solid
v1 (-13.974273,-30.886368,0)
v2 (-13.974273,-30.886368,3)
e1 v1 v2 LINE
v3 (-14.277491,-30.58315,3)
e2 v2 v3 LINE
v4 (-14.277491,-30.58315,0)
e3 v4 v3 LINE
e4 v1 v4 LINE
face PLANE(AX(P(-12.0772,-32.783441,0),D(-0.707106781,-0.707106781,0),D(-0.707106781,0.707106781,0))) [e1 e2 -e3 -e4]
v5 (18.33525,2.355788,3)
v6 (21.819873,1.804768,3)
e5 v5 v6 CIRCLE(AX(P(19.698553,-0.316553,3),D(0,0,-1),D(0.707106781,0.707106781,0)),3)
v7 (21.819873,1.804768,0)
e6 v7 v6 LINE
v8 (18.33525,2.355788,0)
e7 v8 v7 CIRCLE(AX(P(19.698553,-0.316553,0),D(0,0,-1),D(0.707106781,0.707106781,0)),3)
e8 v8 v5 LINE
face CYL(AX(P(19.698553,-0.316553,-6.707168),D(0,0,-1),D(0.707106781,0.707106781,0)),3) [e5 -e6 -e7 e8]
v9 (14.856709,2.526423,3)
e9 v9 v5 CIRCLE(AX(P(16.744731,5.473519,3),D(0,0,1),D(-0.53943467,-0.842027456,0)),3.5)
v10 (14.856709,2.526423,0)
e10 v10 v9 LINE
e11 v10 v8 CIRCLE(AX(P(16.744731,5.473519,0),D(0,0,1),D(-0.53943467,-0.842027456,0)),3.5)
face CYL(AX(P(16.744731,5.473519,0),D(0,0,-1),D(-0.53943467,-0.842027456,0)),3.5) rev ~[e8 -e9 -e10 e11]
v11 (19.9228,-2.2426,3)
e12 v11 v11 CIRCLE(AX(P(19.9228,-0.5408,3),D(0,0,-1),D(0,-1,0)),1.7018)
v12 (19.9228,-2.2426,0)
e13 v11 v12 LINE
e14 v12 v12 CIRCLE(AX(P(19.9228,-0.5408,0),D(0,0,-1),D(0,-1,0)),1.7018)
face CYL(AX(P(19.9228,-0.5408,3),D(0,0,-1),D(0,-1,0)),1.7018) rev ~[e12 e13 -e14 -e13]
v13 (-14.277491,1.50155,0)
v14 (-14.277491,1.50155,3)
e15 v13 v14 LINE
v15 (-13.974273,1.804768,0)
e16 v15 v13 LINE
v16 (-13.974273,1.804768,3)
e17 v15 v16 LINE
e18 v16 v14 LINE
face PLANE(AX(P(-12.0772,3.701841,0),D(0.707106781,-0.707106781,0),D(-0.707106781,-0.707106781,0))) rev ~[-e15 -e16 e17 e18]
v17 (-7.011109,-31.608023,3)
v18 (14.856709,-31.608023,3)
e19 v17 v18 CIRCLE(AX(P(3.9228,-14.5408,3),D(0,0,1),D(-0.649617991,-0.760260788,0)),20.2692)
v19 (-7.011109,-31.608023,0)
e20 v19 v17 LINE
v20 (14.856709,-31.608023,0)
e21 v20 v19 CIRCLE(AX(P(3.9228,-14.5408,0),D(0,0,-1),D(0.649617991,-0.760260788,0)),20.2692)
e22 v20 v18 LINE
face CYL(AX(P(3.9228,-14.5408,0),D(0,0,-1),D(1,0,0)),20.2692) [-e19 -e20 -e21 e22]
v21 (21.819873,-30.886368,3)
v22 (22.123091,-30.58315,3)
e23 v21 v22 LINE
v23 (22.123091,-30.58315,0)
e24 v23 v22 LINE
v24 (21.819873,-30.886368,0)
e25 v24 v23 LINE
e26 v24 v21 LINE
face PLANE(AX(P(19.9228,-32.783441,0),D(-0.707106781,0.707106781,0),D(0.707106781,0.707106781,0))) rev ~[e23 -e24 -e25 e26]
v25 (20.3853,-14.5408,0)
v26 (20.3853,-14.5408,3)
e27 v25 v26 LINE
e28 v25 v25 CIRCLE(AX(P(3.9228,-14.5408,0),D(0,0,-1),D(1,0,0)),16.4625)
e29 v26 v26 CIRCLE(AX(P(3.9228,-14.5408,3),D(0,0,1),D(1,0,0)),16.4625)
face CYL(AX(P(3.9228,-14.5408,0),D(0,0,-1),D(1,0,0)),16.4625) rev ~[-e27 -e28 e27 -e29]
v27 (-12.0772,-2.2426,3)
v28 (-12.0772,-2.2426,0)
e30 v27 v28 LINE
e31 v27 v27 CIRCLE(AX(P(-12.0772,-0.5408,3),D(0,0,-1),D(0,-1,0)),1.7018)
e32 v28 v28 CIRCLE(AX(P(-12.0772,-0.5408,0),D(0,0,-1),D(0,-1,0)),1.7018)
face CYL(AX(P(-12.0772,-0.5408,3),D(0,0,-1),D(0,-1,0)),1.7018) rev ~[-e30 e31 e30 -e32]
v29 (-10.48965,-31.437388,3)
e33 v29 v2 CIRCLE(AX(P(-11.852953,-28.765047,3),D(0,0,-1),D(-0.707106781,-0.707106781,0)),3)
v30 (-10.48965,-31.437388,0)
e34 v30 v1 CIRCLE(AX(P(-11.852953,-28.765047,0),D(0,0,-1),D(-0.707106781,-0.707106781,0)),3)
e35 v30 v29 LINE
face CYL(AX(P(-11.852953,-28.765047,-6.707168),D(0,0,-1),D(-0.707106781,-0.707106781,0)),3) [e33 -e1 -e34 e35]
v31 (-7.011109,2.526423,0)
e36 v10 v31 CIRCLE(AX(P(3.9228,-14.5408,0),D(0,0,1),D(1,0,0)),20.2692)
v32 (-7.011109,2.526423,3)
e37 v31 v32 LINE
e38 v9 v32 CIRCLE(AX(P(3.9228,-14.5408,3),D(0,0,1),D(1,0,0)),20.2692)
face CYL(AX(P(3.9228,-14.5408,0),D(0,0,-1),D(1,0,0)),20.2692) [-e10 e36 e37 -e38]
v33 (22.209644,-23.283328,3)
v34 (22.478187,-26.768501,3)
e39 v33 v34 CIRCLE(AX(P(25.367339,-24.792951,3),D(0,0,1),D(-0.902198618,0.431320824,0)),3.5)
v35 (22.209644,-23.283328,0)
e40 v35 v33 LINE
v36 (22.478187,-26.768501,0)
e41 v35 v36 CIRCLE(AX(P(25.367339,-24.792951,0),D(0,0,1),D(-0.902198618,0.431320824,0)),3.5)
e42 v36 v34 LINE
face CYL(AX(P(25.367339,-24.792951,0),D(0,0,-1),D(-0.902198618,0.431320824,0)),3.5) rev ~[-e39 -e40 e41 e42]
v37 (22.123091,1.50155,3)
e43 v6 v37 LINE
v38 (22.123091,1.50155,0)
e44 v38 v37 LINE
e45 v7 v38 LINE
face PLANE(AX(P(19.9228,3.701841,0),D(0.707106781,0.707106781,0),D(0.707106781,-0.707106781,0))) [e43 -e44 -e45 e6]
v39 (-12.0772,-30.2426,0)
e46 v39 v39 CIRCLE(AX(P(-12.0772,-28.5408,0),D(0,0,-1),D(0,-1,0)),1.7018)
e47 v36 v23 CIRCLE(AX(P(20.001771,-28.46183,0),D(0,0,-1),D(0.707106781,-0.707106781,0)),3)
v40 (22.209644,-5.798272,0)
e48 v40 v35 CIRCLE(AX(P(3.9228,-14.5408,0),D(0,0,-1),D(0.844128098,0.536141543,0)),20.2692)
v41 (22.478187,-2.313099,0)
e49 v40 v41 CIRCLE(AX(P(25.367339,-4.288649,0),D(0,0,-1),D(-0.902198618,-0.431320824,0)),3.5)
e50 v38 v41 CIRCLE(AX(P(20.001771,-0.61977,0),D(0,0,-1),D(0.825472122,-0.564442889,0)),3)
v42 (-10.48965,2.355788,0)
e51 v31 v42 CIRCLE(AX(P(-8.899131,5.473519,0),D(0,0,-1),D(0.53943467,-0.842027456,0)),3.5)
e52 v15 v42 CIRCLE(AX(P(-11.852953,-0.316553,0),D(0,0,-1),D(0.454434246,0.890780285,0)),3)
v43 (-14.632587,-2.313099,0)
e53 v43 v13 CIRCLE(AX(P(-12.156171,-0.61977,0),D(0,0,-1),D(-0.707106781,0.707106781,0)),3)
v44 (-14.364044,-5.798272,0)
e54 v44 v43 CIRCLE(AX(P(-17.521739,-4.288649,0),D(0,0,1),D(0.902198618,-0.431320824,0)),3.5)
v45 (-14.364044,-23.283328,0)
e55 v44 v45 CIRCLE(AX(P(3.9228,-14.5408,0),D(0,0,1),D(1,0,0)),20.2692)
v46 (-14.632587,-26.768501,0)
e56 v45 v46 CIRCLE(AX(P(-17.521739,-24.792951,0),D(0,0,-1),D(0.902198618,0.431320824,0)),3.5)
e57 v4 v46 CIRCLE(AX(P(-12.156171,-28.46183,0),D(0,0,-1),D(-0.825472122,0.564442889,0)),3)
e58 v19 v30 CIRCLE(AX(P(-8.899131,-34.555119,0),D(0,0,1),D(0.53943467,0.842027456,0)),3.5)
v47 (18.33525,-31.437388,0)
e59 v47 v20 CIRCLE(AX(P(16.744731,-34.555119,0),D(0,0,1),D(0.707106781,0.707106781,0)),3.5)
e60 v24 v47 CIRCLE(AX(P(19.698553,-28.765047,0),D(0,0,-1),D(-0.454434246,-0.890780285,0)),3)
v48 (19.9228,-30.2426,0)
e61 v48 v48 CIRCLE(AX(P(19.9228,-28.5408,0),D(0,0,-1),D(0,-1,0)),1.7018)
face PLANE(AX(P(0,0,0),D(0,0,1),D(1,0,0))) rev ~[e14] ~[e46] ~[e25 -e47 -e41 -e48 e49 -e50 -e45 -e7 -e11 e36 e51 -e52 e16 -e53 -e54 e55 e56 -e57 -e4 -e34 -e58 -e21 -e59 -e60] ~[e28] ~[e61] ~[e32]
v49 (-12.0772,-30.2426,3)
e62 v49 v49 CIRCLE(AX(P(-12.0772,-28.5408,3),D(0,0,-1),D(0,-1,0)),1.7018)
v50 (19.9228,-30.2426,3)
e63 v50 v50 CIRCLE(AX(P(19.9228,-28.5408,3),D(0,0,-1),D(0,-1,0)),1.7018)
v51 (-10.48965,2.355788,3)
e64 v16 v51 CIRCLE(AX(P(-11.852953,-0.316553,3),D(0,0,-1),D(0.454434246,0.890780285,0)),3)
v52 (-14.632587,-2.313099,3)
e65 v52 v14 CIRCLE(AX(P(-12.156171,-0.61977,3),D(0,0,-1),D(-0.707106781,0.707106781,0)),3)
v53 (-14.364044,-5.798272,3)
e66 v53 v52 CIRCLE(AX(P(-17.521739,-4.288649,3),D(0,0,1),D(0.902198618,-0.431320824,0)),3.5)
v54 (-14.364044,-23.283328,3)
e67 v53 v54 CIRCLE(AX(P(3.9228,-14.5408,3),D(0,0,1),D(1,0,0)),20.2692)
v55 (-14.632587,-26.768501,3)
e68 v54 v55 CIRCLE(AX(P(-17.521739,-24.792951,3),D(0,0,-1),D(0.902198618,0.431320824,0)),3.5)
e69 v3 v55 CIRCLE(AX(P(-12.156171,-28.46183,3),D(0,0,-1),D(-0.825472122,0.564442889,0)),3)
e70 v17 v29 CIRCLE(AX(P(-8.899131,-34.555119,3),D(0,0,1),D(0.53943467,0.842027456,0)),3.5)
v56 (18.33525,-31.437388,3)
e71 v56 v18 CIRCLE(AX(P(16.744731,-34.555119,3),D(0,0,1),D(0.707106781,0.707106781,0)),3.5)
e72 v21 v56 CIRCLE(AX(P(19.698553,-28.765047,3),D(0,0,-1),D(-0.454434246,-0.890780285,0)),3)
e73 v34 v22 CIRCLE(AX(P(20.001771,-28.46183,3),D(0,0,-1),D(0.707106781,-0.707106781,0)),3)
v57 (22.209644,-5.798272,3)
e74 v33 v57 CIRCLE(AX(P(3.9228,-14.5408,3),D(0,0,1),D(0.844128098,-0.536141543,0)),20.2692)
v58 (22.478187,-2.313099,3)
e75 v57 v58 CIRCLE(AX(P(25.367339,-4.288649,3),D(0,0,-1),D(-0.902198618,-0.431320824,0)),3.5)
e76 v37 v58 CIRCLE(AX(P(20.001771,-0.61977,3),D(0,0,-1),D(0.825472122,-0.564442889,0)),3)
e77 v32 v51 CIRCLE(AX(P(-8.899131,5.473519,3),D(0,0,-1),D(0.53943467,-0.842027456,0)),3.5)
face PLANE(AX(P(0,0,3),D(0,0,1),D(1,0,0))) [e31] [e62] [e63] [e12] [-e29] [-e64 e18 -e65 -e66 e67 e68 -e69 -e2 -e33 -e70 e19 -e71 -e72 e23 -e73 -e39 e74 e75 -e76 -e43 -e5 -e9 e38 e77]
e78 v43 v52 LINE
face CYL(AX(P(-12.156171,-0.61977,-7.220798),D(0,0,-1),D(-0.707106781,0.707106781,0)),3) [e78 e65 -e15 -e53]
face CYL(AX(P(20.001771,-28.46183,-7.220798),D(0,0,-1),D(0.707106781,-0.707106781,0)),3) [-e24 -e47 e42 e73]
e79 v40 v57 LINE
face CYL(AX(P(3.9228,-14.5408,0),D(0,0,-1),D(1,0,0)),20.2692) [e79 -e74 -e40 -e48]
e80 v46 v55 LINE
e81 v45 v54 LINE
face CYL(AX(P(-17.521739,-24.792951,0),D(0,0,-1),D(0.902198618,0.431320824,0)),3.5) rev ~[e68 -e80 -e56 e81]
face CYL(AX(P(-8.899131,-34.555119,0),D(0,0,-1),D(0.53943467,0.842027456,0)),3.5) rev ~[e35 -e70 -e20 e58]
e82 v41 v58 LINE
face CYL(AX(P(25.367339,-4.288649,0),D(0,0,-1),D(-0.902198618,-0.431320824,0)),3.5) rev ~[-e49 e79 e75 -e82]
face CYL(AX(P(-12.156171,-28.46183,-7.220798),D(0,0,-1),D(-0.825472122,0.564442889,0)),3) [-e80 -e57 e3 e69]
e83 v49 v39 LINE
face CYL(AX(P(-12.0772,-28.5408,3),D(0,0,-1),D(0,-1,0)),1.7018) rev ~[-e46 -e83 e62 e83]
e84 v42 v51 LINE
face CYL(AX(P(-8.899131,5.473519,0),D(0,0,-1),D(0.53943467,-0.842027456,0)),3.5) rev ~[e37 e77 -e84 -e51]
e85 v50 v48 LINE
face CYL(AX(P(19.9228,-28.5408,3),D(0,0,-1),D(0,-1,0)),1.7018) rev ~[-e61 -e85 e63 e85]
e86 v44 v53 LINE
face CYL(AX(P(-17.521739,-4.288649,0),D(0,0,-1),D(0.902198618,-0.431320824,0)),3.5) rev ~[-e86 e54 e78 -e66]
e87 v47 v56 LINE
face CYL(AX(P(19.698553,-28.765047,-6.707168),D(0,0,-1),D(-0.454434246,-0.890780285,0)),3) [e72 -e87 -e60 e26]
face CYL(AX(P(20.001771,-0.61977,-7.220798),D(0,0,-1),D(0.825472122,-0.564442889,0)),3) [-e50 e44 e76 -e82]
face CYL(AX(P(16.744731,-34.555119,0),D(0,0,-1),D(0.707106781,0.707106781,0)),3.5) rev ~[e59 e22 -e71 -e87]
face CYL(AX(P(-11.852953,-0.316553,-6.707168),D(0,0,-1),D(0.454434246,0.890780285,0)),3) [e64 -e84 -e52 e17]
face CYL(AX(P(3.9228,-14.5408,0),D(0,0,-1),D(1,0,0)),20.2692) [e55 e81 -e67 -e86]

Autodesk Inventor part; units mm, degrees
ref_plane "YZ Plane" through (0, 0, 0) normal (1, 0, 0) x (0, 1, 0)
ref_plane "XZ Plane" through (0, 0, 0) normal (0, 1, 0) x (-1, 0, 0)
ref_plane "XY Plane" through (0, 0, 0) normal (0, 0, 1) x (1, 0, 0)
sketch "Sketch6" plane through (0, 0, 0) normal (0, 0, 1) x (1, 0, 0)
  circle A0 centre (3.9228, -14.5408) radius 10.15
  line L0 (10.903848, -34.81) -> (-10.903848, -34.81)
  line L1 (54.2, 8.803848) -> (54.2, -8.803848)
  circle A1 centre (3.9228, -14.5408) radius 16.4625
  circle A2 centre (19.9228, -0.5408) radius 1.5
  circle A3 centre (3.9228, -14.5408) radius 18.415
  line L2 (3.9228, -14.5408) -> (3.9228, -8.803848)
  line L3 (3.9228, -14.5408) -> (9.053444, -14.5408)
  circle A4 centre (3.9228, -14.5408) radius 20.2692
  line L4 (17.090037, 0.869078) -> (19.9228, 3.701841)
  line L5 (21.032601, -3.67364) -> (24.165441, -0.5408)
  line L6 (19.9228, 3.701841) -> (24.165441, -0.5408)
  line L7 (3.9228, -14.5408) -> (19.9228, -0.5408) construction
  line L8 (-12.0772, 3.701841) -> (-16.319841, -0.5408)
  line L9 (-13.187001, -3.67364) -> (-16.319841, -0.5408)
  circle A5 centre (-12.0772, -0.5408) radius 1.5
  line L10 (-9.244437, 0.869078) -> (-12.0772, 3.701841)
  line L11 (-9.244437, -29.950678) -> (-12.0772, -32.783441)
  line L12 (-12.0772, -32.783441) -> (-16.319841, -28.5408)
  circle A6 centre (-12.0772, -28.5408) radius 1.5
  line L13 (-13.187001, -25.40796) -> (-16.319841, -28.5408)
  line L14 (17.090037, -29.950678) -> (19.9228, -32.783441)
  line L15 (19.9228, -32.783441) -> (24.165441, -28.5408)
  line L16 (21.032601, -25.40796) -> (24.165441, -28.5408)
  circle A7 centre (19.9228, -28.5408) radius 1.5
  line L17 (24.165441, -28.5408) -> (18.258589, -22.633949)
  line L18 (19.9228, -32.783441) -> (14.388092, -27.248733)
  line L19 (-12.0772, -32.783441) -> (-6.542492, -27.248733)
  line L20 (-16.319841, -28.5408) -> (-10.412989, -22.633949)
  line L21 (-16.319841, -0.5408) -> (-10.412989, -6.447651)
  line L22 (-12.0772, 3.701841) -> (-6.542492, -1.832867)
  point P0 (0, 0)
  point P1 (0, 0)
  dimension "d53" = 32.925
  dimension "d54" = 3
  dimension "d55" = 36.83
  dimension "d56" = 14
  dimension "d57" = 16
  dimension "d58" = 45
  dimension "d59" = 3
  dimension "d60" = 3
  dimension "d61" = 3
extrude "Extrusion4" add sketch "Sketch6" along normal blind 3 contours A1 L22 A3 L17 | A1 L21 A3 L22 | L17 A3 L18 A1 | A1 L20 A3 L21 | L22 A4 A2 L17 A3 | A3 L21 A4 A5 L22 | L18 A3 L19 A1 | L17 A4 A7 L18 A3 | A1 L19 A3 L20 | A3 L20 A4 L21 | A4 A5 L9 L8 L10 | L18 A4 L19 A3 | L16 L15 L14 A4 A7 | A3 L19 A4 A6 L20 | L4 L6 L5 A4 A2 | A5 A4 | A4 A5 | A7 A4 | A4 A7 | A4 A6 L11 L12 L13 | A4 A2 | A2 A4 | A6 A4 | A4 A6
fillet "Fillet4" radius 3.5 8 edges at (-9.2444, 0.8691, 1.5) (-13.187, -3.6736, 1.5) (-13.187, -25.408, 1.5) (-9.2444, -29.9507, 1.5) (17.09, 0.8691, 1.5) (21.0326, -3.6736, 1.5) (21.0326, -25.408, 1.5) (17.09, -29.9507, 1.5)
fillet "Fillet5" radius 3 8 edges at (19.9228, 3.7018, 1.5) (24.1654, -0.5408, 1.5) (24.1654, -28.5408, 1.5) (19.9228, -32.7834, 1.5) (-16.3198, -28.5408, 1.5) (-12.0772, -32.7834, 1.5) (-16.3198, -0.5408, 1.5) (-12.0772, 3.7018, 1.5)
sketch "Sketch7" plane through (0, 0, 3) normal (0, 0, 1) x (1, 0, 0)
  circle A0 centre (3.9228, -14.5408) radius 10.15
  line L0 (10.903848, -34.81) -> (-10.903848, -34.81)
  line L1 (54.2, 8.803848) -> (54.2, -8.803848)
  circle A1 centre (3.9228, -14.5408) radius 16.4625
  circle A2 centre (19.9228, -0.5408) radius 1.5
  circle A3 centre (3.9228, -14.5408) radius 18.415
  line L2 (3.9228, -14.5408) -> (3.9228, -8.803848)
  line L3 (3.9228, -14.5408) -> (9.053444, -14.5408)
  circle A4 centre (3.9228, -14.5408) radius 20.2692
  line L4 (17.090037, 0.869078) -> (19.9228, 3.701841)
  line L5 (21.032601, -3.67364) -> (24.165441, -0.5408)
  line L6 (19.9228, 3.701841) -> (24.165441, -0.5408)
  line L7 (3.9228, -14.5408) -> (19.9228, -0.5408) construction
  line L8 (-12.0772, 3.701841) -> (-16.319841, -0.5408)
  line L9 (-13.187001, -3.67364) -> (-16.319841, -0.5408)
  circle A5 centre (-12.0772, -0.5408) radius 1.5
  line L10 (-9.244437, 0.869078) -> (-12.0772, 3.701841)
  line L11 (-9.244437, -29.950678) -> (-12.0772, -32.783441)
  line L12 (-12.0772, -32.783441) -> (-16.319841, -28.5408)
  circle A6 centre (-12.0772, -28.5408) radius 1.5
  line L13 (-13.187001, -25.40796) -> (-16.319841, -28.5408)
  line L14 (17.090037, -29.950678) -> (19.9228, -32.783441)
  line L15 (19.9228, -32.783441) -> (24.165441, -28.5408)
  line L16 (21.032601, -25.40796) -> (24.165441, -28.5408)
  circle A7 centre (19.9228, -28.5408) radius 1.5
  line L17 (24.165441, -28.5408) -> (18.258589, -22.633949)
  line L18 (19.9228, -32.783441) -> (14.388092, -27.248733)
  line L19 (-12.0772, -32.783441) -> (-6.542492, -27.248733)
  line L20 (-16.319841, -28.5408) -> (-10.412989, -22.633949)
  line L21 (-16.319841, -0.5408) -> (-10.412989, -6.447651)
  line L22 (-12.0772, 3.701841) -> (-6.542492, -1.832867)
  point P0 (0, 0)
  point P1 (0, 0)
  dimension "d66" = 32.925
  dimension "d67" = 3
  dimension "d68" = 36.83
  dimension "d69" = 14
  dimension "d70" = 16
  dimension "d71" = 45
  dimension "d72" = 3
  dimension "d73" = 3
  dimension "d74" = 3
hole "Hole3" at (-12.0772, -0.5408, 3) at (-12.0772, -28.5408, 3) at (19.9228, -28.5408, 3) at (19.9228, -0.5408, 3) direction (0, 0, -1) diameter 3.4036 depth 25.4 tip angle 118 clearance for "Flat Head Machine Screw" size "M3" standard "Ansi Metric M Profile"
properties part number "Cam.case.glassmount" material "Aluminum-6061"
